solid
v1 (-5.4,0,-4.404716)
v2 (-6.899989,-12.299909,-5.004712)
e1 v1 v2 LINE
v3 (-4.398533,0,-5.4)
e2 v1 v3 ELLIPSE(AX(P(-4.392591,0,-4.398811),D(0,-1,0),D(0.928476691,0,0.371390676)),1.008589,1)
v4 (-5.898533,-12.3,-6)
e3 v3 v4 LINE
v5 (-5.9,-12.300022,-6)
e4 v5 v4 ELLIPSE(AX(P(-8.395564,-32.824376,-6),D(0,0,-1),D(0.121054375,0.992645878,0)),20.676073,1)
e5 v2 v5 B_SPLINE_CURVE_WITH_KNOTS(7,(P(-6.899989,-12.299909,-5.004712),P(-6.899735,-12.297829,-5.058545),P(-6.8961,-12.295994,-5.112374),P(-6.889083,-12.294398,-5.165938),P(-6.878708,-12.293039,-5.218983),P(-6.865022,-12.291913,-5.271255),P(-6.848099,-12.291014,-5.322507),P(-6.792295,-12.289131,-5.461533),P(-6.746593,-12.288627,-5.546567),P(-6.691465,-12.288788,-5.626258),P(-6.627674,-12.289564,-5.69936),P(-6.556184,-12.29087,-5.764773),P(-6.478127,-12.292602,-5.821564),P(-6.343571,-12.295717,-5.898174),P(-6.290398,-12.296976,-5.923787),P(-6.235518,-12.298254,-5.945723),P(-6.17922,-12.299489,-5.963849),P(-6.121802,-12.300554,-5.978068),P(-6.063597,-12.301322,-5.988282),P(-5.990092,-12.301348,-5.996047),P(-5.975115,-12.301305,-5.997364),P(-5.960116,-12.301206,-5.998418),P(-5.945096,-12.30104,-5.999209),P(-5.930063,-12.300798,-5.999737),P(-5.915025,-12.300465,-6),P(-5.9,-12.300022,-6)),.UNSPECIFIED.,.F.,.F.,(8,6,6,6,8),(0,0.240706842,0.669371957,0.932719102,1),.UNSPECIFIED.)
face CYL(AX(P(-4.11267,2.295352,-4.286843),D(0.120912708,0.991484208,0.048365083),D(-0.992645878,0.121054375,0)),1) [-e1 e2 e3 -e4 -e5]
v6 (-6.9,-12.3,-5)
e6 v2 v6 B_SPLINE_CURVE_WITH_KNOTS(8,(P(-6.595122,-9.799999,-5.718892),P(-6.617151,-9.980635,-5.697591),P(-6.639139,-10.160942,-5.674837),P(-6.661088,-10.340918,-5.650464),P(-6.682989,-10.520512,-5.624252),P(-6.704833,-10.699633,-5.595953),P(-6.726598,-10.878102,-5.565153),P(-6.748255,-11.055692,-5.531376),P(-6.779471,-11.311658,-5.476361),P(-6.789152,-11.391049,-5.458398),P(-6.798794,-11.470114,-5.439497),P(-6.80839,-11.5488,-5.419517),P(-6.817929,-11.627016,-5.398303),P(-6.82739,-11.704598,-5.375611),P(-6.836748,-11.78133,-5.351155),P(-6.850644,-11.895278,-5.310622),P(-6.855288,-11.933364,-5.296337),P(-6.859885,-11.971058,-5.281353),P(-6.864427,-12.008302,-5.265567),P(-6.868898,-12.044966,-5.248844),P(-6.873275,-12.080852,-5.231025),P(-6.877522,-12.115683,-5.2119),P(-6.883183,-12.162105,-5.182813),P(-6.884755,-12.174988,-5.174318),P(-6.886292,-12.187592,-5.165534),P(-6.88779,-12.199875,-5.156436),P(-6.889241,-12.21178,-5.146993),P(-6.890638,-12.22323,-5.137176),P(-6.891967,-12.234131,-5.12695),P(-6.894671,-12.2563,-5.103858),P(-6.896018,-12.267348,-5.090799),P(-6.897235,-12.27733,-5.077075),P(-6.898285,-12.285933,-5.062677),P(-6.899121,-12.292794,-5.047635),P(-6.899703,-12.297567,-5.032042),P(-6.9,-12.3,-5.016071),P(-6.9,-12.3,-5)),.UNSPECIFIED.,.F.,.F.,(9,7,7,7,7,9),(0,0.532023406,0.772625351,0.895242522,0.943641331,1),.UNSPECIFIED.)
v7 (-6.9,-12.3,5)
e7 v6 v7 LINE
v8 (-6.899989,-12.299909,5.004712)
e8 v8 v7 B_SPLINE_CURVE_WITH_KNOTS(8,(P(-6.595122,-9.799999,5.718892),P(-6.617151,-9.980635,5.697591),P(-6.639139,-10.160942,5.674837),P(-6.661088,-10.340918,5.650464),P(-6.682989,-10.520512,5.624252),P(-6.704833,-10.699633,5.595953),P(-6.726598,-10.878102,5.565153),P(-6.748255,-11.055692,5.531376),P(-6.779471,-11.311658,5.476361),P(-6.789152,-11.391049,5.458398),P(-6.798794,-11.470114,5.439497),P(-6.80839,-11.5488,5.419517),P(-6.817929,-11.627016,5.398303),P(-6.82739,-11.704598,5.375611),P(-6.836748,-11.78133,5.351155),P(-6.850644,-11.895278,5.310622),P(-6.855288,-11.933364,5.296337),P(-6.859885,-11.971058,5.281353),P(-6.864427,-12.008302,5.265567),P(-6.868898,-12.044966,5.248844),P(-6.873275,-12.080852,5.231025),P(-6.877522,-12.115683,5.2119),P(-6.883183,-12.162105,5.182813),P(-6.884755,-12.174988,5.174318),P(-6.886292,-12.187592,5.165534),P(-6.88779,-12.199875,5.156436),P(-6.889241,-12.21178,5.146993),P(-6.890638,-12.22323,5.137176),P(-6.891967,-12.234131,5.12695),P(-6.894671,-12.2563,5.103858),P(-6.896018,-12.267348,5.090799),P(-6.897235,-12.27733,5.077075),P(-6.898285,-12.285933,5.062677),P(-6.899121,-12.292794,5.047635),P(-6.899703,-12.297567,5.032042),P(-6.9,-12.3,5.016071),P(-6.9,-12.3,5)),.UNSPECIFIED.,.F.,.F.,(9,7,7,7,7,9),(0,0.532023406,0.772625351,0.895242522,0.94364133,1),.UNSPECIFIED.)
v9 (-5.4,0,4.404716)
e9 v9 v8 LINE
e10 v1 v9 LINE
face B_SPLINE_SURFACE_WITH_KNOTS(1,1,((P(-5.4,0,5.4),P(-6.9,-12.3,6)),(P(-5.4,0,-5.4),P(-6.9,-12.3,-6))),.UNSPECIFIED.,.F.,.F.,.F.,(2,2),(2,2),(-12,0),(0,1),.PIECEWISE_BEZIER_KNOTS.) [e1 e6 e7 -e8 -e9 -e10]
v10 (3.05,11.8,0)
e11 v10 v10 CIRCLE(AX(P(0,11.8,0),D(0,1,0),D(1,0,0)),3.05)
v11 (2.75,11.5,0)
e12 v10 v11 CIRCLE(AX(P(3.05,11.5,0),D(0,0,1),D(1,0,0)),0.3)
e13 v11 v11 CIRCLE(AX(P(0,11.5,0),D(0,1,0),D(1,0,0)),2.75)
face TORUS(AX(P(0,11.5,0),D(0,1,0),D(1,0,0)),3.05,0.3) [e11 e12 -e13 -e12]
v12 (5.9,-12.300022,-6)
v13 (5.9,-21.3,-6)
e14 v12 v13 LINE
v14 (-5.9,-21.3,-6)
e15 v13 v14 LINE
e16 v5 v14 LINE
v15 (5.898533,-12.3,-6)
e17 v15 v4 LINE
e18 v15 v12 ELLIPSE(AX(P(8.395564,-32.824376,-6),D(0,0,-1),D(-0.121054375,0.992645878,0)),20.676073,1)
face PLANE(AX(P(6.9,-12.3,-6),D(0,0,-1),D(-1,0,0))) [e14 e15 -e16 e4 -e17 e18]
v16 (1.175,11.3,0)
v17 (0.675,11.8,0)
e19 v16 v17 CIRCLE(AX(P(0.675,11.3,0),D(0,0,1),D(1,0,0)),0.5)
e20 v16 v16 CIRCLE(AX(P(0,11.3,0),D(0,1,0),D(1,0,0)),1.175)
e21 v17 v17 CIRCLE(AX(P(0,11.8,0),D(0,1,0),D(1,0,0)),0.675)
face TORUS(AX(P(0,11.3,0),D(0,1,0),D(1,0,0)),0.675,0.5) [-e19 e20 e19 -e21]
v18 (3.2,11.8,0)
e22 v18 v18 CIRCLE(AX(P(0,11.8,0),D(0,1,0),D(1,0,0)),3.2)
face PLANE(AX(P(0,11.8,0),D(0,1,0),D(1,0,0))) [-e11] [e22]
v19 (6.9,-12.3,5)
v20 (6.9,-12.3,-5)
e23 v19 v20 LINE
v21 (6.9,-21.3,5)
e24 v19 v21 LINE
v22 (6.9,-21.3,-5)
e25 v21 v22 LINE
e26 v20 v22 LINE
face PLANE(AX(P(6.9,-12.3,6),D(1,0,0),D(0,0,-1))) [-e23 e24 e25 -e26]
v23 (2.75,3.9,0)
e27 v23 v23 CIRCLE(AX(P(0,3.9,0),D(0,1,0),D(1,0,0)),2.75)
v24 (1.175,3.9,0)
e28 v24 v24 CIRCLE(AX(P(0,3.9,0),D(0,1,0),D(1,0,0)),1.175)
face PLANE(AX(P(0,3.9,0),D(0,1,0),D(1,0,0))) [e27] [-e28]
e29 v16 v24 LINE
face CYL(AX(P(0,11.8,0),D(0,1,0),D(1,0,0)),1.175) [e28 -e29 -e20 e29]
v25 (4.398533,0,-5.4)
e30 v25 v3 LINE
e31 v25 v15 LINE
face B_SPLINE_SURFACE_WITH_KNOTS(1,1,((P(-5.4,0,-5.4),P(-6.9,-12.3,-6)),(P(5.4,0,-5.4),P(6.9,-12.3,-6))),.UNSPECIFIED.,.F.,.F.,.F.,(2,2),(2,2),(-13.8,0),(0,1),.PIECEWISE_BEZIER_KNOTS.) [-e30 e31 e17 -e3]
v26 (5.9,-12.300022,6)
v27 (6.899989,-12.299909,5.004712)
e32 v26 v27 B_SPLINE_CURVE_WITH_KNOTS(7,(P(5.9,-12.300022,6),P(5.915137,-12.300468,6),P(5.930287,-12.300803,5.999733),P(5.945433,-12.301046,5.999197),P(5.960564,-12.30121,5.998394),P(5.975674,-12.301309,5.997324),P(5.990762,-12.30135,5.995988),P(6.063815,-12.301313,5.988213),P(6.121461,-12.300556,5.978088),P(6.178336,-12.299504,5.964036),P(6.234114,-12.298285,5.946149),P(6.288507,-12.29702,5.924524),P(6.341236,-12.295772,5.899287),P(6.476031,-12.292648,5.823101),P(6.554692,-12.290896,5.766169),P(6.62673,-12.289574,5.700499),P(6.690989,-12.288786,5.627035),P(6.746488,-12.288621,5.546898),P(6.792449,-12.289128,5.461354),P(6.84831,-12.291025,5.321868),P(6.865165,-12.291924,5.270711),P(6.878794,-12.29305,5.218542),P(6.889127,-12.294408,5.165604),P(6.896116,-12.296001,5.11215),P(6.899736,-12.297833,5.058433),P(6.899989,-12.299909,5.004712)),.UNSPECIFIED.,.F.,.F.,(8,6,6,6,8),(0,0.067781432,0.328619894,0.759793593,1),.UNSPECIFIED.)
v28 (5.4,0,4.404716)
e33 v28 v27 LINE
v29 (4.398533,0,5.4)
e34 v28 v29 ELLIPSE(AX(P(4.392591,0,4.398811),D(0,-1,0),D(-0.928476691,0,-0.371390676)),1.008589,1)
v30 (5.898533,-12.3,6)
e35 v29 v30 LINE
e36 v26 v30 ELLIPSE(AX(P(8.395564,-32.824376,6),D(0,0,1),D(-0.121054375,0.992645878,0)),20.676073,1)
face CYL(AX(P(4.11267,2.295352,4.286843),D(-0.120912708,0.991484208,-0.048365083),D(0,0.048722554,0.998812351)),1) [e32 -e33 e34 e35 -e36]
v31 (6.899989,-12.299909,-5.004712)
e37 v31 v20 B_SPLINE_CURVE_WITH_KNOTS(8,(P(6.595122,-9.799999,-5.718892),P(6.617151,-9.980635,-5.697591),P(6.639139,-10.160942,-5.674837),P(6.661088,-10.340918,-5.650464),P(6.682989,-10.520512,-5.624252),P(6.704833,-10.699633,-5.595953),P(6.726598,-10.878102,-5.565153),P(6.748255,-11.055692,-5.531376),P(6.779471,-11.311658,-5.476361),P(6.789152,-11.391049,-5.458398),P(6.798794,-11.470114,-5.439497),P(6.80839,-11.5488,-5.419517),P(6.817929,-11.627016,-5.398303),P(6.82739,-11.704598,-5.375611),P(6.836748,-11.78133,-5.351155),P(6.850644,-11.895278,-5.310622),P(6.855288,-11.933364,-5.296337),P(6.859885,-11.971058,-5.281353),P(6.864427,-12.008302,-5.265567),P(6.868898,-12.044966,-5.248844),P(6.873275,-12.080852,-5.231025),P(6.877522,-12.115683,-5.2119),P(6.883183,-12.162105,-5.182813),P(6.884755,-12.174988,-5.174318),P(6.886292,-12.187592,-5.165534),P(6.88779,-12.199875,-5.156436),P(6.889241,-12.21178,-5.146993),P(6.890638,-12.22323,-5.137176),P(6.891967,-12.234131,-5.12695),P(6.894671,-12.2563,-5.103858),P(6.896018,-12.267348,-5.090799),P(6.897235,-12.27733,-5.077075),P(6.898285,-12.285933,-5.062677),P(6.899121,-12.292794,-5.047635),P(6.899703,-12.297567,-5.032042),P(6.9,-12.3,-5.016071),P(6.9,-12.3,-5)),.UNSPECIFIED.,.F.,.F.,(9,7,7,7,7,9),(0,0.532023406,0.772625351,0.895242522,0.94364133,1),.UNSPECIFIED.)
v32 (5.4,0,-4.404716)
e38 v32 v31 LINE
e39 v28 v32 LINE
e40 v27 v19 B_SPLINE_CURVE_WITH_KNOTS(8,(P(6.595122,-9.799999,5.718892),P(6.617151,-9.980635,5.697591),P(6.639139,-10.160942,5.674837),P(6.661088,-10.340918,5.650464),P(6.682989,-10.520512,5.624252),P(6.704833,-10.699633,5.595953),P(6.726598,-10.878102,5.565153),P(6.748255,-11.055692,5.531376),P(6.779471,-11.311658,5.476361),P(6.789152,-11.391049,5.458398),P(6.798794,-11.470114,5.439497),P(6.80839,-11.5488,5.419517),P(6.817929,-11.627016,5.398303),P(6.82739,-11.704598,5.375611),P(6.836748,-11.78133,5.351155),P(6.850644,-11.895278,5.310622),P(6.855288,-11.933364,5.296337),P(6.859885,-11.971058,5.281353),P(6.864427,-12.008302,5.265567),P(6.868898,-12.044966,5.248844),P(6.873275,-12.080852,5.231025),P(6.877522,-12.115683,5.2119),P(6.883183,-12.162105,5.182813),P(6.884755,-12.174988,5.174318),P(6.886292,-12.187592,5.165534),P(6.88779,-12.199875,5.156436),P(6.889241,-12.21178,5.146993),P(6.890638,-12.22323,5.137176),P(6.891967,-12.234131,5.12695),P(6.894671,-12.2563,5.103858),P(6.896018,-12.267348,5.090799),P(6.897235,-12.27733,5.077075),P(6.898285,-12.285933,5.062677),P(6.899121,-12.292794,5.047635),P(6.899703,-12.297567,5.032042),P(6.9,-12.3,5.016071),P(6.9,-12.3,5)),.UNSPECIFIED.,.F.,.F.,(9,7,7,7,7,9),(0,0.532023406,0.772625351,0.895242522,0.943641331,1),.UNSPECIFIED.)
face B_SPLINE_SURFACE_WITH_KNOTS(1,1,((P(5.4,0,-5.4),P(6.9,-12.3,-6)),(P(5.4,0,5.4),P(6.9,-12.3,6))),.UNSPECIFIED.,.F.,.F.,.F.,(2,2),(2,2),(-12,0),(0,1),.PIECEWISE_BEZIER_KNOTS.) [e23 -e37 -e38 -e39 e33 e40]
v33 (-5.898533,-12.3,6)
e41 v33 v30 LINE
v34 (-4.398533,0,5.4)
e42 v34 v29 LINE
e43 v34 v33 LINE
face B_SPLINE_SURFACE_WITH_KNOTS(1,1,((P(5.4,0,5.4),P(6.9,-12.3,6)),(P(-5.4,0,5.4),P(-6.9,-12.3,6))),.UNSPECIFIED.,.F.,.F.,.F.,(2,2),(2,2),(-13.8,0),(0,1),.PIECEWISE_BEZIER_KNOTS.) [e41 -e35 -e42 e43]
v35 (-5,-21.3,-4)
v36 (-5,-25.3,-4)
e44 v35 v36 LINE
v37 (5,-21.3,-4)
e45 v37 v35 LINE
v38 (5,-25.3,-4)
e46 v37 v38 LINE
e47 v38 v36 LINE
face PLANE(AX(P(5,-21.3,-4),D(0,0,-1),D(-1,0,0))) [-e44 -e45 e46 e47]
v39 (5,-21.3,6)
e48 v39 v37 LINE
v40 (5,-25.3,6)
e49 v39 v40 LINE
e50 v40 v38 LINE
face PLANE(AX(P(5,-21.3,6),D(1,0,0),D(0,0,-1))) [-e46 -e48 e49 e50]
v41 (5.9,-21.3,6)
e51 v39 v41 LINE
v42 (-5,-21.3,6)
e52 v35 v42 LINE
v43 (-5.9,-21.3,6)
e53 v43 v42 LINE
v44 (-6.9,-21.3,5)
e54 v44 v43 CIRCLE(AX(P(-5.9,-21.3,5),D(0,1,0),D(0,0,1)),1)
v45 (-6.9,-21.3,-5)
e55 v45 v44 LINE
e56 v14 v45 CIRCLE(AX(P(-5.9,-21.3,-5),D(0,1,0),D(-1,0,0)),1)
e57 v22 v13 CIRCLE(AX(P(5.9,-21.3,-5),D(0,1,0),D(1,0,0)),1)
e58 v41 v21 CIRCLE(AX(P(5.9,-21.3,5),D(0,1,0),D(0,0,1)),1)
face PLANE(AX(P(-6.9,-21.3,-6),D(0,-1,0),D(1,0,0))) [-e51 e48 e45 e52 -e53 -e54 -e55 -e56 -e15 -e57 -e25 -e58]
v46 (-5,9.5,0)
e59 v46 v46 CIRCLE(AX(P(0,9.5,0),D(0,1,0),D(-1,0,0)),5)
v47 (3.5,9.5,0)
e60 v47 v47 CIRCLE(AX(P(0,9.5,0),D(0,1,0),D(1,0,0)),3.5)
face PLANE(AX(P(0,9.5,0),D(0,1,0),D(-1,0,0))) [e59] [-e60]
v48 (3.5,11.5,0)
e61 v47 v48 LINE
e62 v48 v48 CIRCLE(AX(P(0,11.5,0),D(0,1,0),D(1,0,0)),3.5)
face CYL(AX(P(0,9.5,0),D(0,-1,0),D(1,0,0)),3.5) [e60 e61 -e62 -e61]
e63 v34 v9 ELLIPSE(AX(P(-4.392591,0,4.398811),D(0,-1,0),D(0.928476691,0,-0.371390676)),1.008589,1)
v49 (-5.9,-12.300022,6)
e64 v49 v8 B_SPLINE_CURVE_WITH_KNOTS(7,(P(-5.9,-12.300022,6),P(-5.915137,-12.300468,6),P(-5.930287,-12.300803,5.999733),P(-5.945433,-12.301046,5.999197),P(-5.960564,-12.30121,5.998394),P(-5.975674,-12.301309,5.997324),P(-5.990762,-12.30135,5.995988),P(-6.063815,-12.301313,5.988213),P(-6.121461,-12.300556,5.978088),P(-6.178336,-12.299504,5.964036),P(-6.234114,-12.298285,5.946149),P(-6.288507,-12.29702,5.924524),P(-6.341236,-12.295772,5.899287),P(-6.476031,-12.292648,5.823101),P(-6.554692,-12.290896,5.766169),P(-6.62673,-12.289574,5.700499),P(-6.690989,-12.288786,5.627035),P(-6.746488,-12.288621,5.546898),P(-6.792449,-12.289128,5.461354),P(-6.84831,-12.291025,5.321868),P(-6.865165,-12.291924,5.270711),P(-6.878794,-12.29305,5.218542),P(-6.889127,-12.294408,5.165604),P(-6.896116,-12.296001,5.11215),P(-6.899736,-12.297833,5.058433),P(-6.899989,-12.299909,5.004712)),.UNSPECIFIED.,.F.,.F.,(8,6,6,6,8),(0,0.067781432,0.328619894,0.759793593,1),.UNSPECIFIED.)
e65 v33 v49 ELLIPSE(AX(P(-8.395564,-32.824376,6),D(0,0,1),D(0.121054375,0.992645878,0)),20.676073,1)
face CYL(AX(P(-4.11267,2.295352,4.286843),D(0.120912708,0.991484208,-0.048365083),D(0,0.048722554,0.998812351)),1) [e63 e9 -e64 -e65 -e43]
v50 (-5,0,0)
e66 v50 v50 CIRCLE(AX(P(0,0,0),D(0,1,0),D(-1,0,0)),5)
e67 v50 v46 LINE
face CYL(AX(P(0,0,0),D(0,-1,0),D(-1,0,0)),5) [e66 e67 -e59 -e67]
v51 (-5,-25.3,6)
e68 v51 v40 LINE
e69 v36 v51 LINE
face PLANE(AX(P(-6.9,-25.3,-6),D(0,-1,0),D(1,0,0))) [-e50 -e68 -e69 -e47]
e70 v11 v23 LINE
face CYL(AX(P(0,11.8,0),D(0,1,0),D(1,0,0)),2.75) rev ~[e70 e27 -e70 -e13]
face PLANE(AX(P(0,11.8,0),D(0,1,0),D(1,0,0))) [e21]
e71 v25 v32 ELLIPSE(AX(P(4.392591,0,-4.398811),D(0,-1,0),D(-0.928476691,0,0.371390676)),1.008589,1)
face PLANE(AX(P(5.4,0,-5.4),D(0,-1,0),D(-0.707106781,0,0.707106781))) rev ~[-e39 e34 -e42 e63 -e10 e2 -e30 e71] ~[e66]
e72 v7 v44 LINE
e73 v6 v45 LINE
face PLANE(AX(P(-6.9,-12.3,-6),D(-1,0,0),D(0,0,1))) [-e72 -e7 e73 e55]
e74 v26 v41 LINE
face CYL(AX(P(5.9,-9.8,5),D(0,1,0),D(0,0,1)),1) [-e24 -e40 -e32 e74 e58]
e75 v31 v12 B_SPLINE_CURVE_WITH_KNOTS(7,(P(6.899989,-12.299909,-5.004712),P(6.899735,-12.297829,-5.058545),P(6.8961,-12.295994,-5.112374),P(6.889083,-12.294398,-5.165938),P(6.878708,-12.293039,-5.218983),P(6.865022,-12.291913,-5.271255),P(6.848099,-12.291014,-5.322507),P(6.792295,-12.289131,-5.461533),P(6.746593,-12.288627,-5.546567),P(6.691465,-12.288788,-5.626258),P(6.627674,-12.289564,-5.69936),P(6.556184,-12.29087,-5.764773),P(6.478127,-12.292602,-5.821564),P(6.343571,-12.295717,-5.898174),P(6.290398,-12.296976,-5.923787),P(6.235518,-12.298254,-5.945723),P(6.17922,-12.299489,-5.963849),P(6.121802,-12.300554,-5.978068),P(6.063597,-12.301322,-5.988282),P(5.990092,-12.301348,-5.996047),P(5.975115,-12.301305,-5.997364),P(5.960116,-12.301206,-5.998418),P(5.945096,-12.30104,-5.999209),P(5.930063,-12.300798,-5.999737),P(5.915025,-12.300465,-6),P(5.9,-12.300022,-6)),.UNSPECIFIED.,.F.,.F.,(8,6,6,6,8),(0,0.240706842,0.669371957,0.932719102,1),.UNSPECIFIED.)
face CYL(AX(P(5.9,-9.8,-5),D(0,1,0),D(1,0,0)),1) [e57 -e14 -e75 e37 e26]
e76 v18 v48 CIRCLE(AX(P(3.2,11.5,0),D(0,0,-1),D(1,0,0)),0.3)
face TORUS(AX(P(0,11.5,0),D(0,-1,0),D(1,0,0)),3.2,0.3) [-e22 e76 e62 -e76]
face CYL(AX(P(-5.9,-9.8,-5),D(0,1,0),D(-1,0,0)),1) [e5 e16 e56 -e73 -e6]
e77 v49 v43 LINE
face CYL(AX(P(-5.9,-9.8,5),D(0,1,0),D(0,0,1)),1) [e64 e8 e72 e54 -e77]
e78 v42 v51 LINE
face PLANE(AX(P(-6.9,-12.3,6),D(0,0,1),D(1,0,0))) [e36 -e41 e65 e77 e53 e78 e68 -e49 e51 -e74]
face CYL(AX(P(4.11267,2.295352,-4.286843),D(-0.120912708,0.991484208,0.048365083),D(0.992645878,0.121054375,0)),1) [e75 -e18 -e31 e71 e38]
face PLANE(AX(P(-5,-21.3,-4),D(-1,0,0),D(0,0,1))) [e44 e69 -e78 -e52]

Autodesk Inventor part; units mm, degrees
ref_plane "YZ Plane" through (0, 0, 0) normal (1, 0, 0) x (0, 1, 0)
ref_plane "XZ Plane" through (0, 0, 0) normal (0, 1, 0) x (-1, 0, 0)
sketch "Sketch1" plane through (0, 0, 0) normal (0, 1, 0) x (-1, 0, 0)
  circle A0 centre (0, 0) radius 5
  dimension "d0" = 10
extrude "Extrusion1" add sketch "Sketch1" along normal blind 9.5
sketch "Sketch2" plane through (0, 9.5, 0) normal (0, 1, 0) x (1, 0, 0)
  circle A0 centre (0, 0) radius 3.5
  dimension "d3" = 7
extrude "Extrusion2" add sketch "Sketch2" along normal blind 2.3
sketch "Sketch3" plane through (0, 0, 0) normal (0, -1, 0) x (1, 0, 0)
  line L0 (5.4, -5.4) -> (-5.4, -5.4)
  line L1 (-5.4, -5.4) -> (-5.4, 5.4)
  line L2 (-5.4, 5.4) -> (5.4, 5.4)
  line L3 (5.4, 5.4) -> (5.4, -5.4)
  line L4 (5.4, -5.4) -> (-5.4, 5.4) construction
  line L5 (-5.4, -5.4) -> (5.4, 5.4) construction
  point P0 (0, 0)
  dimension "d6" = 10.8
  dimension "d7" = 10.8
ref_plane "Work Plane1" through (0, -12.3, 0) normal (0, -1, 0) x (1, 0, 0)
sketch "Sketch4" plane through (0, -12.3, 0) normal (0, -1, 0) x (1, 0, 0)
  line L0 (6.9, -6) -> (-6.9, -6)
  line L1 (-6.9, -6) -> (-6.9, 6)
  line L2 (-6.9, 6) -> (6.9, 6)
  line L3 (6.9, 6) -> (6.9, -6)
  line L4 (6.9, -6) -> (-6.9, 6) construction
  line L5 (-6.9, -6) -> (6.9, 6) construction
  point P0 (0, 0)
  dimension "d9" = 13.8
  dimension "d10" = 12
loft "Loft1" add profiles "Sketch3", "Sketch4"
sketch "Sketch6" plane through (-6.9, -12.3, -6) normal (0, -1, 0) x (1, 0, 0)
  line L0 (12.3, 0.6) -> (13.8, 0) projected
  line L1 (0, 12) -> (13.8, 12)
  line L2 (13.8, 12) -> (13.8, 0)
  line L3 (13.8, 0) -> (0, 0)
  line L4 (0, 0) -> (0, 12)
  line L5 (0, 12) -> (13.8, 0) construction
  line L6 (13.8, 12) -> (0, 0) construction
  point P0 (6.9, 6)
extrude "Extrusion3" add sketch "Sketch6" along normal blind 9
fillet "Fillet2" radius 1 8 edges at (6.15, -6.15, -5.7) (-6.15, -6.15, -5.7) (6.15, -6.15, 5.7) (-6.15, -6.15, 5.7) (6.9, -16.8, 6) (6.9, -16.8, -6) (-6.9, -16.8, 6) (-6.9, -16.8, -6)
sketch "Sketch8" plane through (-6.9, -21.3, -6) normal (0, -1, 0) x (1, 0, 0)
  line L0 (1.0015, 12) -> (12.7985, 12) projected
  line L1 (11.9, 12) -> (11.9, 2)
  line L2 (11.9, 2) -> (1.9, 2)
  line L3 (1.9, 2) -> (1.9, 12)
  line L4 (1.9, 12) -> (11.9, 12)
  line L5 (13.8, 1) -> (13.8, 11) projected
  line L6 (0, 11) -> (0, 1) projected
  point P0 (6.9, 6)
  dimension "d25" = 10
  dimension "d26" = 10
  dimension "d27" = 1.9
  dimension "d29" = 1.9
extrude "Extrusion5" add sketch "Sketch8" along normal blind 4
sketch "Sketch9" plane through (0, 11.8, 0) normal (0, 1, 0) x (1, 0, 0)
  circle A0 centre (0, 0) radius 1.175
  circle A1 centre (0, 0) radius 2.75
  dimension "d32" = 2.35
  dimension "d33" = 5.5
extrude "Extrusion6" cut sketch "Sketch9" against normal blind 7.9
fillet "Fillet3" radius 0.5 1 edges at (-1.175, 11.8, 0)
fillet "Fillet4" radius 0.3 1 edges at (-3.5, 11.8, 0)
fillet "Fillet5" radius 0.3 1 edges at (-2.75, 11.8, 0)
properties part number "ConectorFuente"
